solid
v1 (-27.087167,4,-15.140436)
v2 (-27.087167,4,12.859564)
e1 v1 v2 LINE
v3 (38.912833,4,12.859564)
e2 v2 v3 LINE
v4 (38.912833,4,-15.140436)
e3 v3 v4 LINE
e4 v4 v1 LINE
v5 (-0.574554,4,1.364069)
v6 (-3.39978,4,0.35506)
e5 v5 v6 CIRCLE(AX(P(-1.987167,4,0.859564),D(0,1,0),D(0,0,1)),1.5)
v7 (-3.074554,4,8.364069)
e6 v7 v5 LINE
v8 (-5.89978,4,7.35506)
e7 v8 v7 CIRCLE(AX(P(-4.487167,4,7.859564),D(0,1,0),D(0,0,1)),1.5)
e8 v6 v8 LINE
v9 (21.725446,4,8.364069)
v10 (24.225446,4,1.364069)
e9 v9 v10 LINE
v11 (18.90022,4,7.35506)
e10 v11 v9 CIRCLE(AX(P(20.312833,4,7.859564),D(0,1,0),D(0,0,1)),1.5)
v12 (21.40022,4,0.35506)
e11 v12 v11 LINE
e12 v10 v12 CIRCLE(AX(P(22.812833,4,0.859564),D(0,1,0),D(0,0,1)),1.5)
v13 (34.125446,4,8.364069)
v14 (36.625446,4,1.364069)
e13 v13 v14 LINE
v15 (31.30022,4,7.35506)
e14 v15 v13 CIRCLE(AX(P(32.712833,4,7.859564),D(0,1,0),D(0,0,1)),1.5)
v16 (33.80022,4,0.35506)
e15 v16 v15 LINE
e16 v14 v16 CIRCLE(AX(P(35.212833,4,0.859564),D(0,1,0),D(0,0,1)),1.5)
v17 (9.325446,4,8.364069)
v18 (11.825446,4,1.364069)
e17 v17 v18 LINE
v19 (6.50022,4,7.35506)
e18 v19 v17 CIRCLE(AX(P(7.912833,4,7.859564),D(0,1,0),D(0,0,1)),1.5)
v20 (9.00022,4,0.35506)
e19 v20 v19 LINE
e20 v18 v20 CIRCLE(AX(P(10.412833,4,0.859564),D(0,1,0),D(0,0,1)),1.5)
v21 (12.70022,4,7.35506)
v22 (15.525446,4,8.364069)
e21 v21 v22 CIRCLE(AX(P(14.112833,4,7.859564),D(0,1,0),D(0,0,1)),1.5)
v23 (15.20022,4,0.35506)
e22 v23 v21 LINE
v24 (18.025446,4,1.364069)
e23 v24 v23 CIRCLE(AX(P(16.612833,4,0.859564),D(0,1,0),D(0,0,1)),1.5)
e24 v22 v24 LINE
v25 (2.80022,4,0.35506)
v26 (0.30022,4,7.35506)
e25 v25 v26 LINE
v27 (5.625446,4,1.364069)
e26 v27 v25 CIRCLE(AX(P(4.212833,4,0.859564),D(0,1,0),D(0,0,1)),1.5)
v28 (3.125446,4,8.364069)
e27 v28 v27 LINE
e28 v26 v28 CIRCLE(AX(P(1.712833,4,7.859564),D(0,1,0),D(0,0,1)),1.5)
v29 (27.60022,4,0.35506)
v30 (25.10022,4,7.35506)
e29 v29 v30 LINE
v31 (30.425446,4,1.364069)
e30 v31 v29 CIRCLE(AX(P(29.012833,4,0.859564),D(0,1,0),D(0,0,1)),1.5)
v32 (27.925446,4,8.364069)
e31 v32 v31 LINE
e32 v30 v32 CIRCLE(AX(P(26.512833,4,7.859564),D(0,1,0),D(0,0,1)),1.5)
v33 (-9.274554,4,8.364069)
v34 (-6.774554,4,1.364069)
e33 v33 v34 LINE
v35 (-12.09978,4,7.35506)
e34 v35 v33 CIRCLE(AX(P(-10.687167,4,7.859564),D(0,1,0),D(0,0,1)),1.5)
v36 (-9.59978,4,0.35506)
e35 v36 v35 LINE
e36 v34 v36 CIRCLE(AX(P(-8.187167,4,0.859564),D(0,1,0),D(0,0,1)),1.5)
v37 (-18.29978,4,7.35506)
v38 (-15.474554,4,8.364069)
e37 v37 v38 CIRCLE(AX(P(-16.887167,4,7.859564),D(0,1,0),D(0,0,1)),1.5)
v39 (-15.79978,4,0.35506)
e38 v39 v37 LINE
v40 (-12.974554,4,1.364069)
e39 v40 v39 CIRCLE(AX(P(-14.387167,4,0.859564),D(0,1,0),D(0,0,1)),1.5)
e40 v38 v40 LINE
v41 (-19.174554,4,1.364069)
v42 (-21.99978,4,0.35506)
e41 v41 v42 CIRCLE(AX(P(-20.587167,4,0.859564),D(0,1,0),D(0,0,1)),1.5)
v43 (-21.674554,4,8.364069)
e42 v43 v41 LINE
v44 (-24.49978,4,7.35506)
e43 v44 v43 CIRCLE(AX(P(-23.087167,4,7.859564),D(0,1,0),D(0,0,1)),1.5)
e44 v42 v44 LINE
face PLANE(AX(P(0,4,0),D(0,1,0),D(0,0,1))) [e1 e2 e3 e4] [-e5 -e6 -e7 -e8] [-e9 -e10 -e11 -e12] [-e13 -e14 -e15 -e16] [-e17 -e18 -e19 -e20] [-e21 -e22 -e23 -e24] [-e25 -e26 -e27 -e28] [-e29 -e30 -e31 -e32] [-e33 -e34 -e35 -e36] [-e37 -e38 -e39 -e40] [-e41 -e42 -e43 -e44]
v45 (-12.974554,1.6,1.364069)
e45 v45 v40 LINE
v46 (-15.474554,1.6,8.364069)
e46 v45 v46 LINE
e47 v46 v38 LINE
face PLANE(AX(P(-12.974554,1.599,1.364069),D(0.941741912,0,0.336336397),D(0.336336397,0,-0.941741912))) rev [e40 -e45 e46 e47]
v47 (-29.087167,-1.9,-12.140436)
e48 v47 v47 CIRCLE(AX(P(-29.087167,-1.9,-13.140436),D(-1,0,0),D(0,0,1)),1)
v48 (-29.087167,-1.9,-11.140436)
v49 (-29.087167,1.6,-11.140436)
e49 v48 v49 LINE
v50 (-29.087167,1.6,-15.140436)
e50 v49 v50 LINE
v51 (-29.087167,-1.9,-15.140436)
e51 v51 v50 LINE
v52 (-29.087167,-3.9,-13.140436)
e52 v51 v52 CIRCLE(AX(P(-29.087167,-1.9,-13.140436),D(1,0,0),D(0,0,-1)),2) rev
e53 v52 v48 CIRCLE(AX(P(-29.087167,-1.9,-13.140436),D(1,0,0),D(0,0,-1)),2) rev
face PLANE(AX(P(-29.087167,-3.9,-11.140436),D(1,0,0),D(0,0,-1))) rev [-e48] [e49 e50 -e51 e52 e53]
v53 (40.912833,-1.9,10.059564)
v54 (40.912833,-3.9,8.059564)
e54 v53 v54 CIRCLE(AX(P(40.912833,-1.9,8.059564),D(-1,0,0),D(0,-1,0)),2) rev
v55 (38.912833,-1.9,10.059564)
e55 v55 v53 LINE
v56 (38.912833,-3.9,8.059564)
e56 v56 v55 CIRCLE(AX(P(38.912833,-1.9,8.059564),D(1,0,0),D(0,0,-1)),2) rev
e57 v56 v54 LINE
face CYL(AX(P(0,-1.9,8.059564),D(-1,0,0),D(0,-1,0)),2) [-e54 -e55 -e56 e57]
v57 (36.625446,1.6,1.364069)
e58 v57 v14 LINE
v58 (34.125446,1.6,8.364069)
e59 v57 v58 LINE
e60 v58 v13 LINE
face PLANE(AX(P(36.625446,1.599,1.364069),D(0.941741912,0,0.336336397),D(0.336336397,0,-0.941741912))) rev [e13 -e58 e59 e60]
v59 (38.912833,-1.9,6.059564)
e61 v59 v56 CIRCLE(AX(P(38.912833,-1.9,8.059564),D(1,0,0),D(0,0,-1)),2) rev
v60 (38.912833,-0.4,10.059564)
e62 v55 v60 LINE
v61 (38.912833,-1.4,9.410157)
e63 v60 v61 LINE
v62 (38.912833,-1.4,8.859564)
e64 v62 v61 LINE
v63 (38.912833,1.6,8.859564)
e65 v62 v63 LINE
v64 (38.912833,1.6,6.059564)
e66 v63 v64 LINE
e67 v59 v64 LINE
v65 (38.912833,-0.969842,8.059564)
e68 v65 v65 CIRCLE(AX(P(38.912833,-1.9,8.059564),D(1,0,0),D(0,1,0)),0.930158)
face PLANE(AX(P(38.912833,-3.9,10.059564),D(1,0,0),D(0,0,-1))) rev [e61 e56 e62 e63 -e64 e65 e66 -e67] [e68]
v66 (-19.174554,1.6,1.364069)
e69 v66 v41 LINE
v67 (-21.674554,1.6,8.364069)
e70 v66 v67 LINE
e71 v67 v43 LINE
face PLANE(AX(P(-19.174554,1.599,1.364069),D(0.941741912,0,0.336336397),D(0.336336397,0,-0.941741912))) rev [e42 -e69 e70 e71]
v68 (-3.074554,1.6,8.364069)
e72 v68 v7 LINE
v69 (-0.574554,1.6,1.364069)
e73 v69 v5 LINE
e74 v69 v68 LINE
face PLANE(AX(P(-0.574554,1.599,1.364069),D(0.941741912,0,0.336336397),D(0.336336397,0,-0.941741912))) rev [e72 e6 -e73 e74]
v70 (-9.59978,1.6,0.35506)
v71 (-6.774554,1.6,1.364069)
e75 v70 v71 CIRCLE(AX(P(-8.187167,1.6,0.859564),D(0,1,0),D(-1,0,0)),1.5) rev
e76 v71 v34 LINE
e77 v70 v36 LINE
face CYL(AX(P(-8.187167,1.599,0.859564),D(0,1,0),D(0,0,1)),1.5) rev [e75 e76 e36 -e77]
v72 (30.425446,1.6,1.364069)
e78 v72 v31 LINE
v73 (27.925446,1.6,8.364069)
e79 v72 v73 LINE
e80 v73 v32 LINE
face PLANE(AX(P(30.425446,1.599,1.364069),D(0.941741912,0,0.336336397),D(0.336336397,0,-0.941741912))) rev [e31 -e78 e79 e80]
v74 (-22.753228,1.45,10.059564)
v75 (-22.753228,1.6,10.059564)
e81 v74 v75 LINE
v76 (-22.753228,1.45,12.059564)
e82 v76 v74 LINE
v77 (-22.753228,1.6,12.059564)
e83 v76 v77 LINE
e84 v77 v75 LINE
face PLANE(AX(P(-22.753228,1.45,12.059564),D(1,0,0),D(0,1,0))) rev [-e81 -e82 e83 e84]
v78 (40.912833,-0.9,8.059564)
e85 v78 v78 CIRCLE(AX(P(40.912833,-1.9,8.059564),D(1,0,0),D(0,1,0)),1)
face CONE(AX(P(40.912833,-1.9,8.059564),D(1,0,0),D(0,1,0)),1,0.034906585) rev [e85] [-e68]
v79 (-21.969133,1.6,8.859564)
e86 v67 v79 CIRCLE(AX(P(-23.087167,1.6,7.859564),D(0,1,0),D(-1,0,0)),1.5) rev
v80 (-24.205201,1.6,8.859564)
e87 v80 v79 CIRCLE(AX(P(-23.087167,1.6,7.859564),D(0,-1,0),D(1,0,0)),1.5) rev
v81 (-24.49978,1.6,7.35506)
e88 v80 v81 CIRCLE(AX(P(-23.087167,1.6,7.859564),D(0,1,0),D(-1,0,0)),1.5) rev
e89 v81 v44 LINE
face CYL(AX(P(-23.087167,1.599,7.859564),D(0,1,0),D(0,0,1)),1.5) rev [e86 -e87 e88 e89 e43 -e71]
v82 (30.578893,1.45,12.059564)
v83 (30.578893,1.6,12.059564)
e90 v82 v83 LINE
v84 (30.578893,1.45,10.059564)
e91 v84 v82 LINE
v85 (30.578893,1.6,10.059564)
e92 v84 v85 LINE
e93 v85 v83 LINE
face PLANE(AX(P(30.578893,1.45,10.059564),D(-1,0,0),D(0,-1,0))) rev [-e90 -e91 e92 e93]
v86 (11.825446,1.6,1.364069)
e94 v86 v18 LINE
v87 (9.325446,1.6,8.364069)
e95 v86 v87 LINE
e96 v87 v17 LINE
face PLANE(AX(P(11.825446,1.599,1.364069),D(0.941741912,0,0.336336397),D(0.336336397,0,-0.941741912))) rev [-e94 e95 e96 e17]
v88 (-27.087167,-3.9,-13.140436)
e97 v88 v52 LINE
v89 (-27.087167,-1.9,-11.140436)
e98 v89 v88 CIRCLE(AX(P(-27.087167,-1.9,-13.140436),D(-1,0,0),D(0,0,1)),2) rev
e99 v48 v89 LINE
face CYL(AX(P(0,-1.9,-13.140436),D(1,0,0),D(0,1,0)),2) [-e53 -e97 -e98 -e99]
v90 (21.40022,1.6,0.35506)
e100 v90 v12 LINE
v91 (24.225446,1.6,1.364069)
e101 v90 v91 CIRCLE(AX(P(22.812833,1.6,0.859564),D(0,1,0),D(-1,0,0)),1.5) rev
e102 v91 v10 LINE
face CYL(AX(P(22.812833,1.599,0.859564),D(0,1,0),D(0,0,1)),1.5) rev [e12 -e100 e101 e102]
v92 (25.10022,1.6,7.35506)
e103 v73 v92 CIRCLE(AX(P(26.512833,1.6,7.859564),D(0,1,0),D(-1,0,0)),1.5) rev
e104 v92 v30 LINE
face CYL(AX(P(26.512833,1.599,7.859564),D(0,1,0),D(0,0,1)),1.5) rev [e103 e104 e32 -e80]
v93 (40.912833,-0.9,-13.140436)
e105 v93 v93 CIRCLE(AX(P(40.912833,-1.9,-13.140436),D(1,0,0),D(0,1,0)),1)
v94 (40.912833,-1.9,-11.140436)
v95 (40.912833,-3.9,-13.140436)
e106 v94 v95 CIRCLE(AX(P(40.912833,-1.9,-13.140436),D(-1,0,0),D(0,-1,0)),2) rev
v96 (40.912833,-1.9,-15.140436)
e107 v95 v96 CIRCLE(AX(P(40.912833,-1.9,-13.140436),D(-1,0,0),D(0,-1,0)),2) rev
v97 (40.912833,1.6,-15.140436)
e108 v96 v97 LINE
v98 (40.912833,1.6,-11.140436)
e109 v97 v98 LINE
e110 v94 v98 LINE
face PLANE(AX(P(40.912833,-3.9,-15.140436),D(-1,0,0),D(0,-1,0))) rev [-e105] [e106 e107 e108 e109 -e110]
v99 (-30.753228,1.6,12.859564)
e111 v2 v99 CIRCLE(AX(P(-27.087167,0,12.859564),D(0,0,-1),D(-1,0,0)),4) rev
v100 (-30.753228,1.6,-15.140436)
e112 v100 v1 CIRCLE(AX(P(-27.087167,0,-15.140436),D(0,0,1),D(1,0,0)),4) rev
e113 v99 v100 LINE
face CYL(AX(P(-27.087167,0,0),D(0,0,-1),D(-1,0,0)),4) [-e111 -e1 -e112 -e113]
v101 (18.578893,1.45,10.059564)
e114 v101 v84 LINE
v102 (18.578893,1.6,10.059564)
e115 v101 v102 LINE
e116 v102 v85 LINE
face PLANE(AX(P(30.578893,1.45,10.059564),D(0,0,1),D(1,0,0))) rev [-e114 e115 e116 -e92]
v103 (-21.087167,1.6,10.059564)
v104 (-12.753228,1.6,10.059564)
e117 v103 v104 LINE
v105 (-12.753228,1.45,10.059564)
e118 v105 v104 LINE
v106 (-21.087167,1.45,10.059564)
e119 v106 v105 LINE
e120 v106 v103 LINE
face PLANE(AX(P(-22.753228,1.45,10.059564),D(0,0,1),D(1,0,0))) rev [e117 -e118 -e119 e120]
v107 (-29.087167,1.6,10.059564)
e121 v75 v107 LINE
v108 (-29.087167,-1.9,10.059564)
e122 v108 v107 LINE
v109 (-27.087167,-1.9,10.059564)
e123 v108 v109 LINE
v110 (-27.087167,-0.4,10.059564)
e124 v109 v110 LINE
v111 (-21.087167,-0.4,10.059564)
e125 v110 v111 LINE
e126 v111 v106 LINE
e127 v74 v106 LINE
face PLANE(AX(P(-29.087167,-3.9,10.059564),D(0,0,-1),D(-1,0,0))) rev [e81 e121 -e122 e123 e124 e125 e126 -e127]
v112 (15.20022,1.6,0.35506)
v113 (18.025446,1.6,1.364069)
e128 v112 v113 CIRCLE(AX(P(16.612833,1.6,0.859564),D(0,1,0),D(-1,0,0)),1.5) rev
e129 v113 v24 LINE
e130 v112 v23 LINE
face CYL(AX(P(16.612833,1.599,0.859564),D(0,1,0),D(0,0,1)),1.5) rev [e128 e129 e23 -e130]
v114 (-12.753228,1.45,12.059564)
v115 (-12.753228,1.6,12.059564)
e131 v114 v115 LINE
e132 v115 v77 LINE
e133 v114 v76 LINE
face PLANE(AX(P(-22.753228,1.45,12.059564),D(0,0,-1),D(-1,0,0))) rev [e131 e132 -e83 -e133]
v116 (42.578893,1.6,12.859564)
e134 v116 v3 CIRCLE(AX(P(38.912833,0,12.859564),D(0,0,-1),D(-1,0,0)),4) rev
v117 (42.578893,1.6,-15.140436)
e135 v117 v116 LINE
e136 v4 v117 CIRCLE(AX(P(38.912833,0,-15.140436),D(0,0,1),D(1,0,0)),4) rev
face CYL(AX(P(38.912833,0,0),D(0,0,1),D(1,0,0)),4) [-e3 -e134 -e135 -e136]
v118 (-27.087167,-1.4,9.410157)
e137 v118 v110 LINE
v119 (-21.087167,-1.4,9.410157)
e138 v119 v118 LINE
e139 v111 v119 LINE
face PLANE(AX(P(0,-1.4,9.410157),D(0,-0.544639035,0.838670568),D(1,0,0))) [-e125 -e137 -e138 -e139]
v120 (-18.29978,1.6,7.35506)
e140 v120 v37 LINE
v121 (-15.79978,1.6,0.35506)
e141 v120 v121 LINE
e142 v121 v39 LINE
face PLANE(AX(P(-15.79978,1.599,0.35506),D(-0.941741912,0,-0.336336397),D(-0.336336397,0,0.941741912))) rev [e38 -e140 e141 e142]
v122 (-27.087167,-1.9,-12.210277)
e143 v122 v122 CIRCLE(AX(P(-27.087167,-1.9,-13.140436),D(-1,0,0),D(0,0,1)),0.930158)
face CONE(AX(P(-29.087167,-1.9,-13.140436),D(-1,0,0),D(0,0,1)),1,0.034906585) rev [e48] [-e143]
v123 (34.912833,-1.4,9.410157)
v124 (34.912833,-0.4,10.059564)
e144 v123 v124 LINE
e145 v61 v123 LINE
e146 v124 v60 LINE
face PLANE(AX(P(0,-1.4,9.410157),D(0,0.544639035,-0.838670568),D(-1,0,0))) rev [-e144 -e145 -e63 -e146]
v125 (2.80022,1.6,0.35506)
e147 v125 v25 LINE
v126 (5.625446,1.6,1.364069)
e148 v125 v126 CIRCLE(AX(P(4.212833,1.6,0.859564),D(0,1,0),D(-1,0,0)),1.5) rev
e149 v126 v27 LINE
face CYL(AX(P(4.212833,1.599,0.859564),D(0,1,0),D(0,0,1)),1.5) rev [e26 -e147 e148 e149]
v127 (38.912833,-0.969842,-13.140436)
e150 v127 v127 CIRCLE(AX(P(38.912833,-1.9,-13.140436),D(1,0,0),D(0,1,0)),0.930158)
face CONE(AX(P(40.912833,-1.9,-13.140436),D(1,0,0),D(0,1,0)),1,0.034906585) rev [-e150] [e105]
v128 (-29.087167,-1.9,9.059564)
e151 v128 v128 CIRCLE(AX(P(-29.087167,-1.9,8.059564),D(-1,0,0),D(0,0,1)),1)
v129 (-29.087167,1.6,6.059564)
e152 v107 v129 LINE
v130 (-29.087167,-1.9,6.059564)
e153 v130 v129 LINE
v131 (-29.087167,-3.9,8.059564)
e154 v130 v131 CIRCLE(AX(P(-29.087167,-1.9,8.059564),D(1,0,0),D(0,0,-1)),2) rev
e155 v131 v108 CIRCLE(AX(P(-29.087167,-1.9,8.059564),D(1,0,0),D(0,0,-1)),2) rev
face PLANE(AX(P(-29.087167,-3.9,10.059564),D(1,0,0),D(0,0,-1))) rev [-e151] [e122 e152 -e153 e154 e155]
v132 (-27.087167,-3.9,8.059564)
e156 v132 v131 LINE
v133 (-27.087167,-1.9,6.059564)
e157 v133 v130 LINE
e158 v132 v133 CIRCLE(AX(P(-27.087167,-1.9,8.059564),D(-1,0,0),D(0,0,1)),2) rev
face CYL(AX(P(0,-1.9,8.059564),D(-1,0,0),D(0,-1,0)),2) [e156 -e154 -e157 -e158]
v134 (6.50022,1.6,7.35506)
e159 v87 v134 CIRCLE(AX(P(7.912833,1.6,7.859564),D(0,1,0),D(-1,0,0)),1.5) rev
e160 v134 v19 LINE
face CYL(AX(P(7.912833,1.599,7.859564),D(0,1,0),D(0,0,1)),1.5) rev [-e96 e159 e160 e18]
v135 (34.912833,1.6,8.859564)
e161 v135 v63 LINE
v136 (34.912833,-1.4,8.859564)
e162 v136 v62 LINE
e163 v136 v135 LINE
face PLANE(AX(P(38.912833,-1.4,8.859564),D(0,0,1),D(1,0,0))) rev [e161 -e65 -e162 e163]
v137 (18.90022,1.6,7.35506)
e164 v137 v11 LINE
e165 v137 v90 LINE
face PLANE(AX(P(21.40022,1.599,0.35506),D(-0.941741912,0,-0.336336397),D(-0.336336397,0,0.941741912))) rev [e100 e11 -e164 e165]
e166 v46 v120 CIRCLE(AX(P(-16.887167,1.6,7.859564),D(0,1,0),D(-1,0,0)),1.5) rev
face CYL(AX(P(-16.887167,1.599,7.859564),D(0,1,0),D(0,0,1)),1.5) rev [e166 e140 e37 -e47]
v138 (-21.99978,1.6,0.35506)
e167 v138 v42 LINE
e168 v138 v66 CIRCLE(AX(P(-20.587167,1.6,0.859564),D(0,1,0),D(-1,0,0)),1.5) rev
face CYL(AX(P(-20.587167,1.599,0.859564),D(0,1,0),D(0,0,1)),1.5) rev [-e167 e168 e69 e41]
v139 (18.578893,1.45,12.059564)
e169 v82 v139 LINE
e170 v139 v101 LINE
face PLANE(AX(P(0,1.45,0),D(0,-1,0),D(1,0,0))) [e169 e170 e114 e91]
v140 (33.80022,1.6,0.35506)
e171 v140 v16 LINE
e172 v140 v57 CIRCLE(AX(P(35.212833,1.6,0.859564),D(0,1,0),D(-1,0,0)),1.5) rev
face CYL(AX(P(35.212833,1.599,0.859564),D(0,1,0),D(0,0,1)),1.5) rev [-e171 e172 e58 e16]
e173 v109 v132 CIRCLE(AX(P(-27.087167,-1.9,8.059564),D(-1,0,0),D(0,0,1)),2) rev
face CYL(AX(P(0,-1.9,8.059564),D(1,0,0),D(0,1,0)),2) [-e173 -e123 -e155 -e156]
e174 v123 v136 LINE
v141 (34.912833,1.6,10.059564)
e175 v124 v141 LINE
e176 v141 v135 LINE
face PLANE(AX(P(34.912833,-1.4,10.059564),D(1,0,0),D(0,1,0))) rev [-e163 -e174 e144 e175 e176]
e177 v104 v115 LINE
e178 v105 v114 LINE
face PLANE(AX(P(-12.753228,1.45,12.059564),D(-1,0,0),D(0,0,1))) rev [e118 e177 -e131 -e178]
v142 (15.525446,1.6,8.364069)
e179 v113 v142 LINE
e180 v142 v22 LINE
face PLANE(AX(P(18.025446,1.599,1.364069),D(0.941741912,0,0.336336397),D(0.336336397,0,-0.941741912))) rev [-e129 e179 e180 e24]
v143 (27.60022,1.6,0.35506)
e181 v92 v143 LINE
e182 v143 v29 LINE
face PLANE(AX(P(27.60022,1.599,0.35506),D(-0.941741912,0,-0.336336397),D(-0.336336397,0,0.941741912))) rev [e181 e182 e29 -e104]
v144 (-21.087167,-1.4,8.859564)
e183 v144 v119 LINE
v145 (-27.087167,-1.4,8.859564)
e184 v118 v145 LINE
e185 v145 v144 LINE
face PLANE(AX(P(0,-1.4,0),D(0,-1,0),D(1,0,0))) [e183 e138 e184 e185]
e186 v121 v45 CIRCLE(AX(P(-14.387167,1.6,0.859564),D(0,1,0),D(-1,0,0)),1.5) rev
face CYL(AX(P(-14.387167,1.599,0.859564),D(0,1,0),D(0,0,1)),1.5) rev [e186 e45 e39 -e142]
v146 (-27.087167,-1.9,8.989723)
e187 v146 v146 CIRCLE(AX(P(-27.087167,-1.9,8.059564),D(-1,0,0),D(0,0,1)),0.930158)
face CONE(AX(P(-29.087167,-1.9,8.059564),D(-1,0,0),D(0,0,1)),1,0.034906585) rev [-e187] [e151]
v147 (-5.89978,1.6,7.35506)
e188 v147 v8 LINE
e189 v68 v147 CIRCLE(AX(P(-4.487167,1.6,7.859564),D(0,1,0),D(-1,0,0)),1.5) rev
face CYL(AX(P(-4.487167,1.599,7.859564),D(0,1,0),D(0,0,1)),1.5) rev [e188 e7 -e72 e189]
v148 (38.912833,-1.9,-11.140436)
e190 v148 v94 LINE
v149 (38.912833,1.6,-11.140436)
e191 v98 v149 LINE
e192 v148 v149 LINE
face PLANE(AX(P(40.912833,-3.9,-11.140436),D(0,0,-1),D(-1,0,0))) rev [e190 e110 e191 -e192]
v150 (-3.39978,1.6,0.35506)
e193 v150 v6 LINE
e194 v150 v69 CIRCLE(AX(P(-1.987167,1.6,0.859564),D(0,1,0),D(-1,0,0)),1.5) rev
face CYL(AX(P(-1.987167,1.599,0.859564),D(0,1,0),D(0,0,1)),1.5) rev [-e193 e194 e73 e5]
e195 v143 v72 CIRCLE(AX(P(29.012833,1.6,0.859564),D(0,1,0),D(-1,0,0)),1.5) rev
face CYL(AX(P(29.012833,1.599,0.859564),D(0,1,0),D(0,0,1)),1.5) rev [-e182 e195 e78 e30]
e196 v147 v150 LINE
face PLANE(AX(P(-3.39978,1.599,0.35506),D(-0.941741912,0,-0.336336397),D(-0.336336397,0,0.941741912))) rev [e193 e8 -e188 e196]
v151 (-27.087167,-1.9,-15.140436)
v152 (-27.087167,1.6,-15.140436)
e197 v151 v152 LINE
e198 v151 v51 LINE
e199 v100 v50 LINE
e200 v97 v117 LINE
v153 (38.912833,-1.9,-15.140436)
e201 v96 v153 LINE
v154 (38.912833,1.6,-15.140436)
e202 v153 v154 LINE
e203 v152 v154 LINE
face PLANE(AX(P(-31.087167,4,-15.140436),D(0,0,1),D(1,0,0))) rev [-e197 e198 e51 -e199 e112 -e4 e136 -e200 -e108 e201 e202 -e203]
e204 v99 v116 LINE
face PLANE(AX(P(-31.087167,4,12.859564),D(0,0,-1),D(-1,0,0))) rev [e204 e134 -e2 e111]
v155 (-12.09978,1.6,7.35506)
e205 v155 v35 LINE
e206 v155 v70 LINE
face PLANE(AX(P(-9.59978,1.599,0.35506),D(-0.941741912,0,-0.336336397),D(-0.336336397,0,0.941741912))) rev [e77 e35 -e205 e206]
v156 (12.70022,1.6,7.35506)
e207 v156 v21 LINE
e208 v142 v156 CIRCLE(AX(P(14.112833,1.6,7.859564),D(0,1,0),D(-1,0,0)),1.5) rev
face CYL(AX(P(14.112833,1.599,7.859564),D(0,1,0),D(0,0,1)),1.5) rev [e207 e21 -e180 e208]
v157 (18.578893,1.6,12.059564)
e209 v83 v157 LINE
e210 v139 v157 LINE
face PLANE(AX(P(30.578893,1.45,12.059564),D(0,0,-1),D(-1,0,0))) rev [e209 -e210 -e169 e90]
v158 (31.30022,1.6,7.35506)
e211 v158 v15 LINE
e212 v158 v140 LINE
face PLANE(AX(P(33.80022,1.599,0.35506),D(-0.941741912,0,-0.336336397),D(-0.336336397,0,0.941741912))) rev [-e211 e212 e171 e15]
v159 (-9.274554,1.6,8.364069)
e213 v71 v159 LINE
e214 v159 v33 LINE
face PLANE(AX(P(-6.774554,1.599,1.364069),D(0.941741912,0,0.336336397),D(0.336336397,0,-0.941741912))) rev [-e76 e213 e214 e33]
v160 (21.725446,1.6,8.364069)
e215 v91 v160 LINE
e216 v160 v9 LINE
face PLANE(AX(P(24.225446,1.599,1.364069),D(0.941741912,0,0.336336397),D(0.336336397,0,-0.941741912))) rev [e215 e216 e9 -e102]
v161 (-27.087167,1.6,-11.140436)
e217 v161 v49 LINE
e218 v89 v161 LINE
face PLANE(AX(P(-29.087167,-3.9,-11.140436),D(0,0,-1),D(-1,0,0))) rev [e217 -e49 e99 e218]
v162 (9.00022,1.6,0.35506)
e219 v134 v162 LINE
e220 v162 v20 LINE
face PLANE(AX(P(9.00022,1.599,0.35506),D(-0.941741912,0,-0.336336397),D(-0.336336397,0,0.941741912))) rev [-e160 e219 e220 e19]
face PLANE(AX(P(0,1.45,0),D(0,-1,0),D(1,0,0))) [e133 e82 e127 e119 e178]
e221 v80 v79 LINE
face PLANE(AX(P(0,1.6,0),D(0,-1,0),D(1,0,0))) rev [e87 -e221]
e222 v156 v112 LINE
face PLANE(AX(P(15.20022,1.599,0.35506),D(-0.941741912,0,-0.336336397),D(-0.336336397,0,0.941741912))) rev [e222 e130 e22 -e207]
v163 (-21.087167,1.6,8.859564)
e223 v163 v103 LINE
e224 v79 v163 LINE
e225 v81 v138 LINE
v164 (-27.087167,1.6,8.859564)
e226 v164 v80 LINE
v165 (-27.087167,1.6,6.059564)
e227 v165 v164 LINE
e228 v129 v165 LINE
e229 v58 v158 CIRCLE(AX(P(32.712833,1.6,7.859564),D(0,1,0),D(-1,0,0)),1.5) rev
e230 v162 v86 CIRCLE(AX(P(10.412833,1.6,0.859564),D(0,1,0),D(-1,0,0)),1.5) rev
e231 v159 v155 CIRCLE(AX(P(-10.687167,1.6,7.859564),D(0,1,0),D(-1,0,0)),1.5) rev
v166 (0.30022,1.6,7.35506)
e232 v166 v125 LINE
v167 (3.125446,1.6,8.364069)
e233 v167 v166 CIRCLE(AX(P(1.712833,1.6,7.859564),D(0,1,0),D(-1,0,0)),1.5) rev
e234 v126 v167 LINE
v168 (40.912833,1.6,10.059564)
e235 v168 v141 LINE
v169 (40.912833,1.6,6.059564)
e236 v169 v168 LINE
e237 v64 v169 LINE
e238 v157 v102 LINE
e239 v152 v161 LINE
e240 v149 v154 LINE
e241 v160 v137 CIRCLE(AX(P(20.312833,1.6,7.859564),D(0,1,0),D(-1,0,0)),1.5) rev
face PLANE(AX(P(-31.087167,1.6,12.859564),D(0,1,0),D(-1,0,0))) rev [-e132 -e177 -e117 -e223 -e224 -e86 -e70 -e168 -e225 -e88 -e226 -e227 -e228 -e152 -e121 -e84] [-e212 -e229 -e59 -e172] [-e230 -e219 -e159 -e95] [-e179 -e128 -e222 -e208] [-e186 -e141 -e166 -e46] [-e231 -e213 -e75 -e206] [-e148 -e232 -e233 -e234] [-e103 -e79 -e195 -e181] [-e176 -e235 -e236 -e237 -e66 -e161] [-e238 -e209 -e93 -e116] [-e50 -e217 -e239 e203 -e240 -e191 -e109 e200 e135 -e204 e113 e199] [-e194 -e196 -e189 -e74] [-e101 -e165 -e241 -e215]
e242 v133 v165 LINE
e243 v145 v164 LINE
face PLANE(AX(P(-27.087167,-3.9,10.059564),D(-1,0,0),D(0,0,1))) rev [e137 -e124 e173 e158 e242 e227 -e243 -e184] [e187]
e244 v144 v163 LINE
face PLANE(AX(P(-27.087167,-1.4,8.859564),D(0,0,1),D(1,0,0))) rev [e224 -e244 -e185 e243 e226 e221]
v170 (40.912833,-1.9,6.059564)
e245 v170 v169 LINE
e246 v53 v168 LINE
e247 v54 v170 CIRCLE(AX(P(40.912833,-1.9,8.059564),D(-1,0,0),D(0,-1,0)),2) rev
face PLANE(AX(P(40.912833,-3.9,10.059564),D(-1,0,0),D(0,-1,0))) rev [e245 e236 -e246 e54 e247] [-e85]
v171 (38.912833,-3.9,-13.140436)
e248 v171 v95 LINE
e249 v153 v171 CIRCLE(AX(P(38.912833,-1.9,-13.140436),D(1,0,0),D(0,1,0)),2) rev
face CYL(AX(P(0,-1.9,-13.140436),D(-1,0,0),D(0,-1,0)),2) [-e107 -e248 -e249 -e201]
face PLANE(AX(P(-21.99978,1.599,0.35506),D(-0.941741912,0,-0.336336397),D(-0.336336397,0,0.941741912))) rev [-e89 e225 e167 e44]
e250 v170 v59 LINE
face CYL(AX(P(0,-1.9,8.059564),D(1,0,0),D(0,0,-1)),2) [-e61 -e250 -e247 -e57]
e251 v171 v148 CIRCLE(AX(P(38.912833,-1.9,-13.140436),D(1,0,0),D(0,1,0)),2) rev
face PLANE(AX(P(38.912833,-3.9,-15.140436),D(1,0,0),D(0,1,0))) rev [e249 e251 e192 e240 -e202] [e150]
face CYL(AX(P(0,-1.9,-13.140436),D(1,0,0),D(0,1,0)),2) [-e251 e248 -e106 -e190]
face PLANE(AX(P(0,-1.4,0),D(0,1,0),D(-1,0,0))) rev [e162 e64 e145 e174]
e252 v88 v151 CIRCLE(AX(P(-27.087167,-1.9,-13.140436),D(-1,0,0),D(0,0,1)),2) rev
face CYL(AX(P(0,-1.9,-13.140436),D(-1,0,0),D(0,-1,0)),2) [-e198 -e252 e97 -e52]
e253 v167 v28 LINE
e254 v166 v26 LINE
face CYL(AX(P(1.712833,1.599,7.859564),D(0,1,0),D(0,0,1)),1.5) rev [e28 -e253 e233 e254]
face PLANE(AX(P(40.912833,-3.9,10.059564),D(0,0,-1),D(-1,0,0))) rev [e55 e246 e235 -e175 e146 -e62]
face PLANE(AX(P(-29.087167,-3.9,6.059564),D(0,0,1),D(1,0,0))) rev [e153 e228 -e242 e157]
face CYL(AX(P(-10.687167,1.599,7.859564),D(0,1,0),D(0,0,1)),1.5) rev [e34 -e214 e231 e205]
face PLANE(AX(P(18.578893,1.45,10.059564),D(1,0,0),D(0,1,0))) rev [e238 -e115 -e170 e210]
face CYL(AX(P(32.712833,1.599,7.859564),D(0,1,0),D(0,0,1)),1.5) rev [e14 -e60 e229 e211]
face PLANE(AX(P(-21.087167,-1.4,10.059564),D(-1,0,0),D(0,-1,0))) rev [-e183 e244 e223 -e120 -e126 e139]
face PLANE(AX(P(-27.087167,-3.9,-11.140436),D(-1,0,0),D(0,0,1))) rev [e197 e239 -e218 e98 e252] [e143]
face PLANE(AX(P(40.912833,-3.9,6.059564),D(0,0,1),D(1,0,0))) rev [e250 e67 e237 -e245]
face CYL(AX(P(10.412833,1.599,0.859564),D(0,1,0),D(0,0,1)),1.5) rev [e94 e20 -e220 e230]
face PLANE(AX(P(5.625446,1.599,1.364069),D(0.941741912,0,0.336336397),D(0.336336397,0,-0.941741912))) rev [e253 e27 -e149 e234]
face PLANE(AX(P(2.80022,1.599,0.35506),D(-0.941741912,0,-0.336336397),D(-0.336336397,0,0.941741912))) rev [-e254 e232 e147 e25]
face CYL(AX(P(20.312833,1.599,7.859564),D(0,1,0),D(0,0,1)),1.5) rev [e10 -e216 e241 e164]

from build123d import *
from OCP.BRepFilletAPI import BRepFilletAPI_MakeChamfer

# Parameters (mm, degrees)
SKETCH_2_W                    = 74
SKETCH_2_H                    = 28
EXTRUDE_1_DEPTH               = 4
FILLET_1_R                    = 4
SKETCH_3_W                    = 74
SKETCH_3_H                    = 1.6
CUT_EXTRUDE_1_DEPTH           = 52.395634348
CUT_EXTRUDE_6_REACH           = 47.254
SKETCH_21_W                   = 10
SKETCH_21_H                   = 2
SKETCH_21_W_2                 = 12
EXTRUDE_9_DEPTH               = 0.15
SKETCH_22_W                   = 2
SKETCH_22_H                   = 4
EXTRUDE_10_DEPTH              = 5.5
FILLET_3_R                    = 2
SKETCH_23_R                   = 1
CUT_EXTRUDE_8_DEPTH           = 2
CUT_EXTRUDE_8_DRAFT           = -2
CUT_EXTRUDE_8_PROFILE_2_DEPTH = 2
CUT_EXTRUDE_8_PROFILE_2_DRAFT = -2
SKETCH_24_R                   = 1
CUT_EXTRUDE_9_DEPTH           = 2
CUT_EXTRUDE_9_DRAFT           = -2
CUT_EXTRUDE_9_PROFILE_2_DEPTH = 2
CUT_EXTRUDE_9_PROFILE_2_DRAFT = -2
SKETCH_25_W                   = 6
SKETCH_25_H                   = 1.2
SKETCH_25_W_2                 = 4
EXTRUDE_11_DEPTH              = 3
CHAMFER_1_SIZE                = 1
CHAMFER_1_SIZE2               = 0.649407593


with BuildPart() as part:
    # 草图2 → 凸台-拉伸1 (new body)
    with BuildSketch(Plane(origin=(0, 0, 0), x_dir=(1, 0, 0), z_dir=(0, 1, 0))):
        with Locations((5.91283293, 1.140435835)):
            Rectangle(SKETCH_2_W, SKETCH_2_H)
    extrude(amount=EXTRUDE_1_DEPTH)

    # 圆角1
    fillet_1_edges = [part.edges().sort_by_distance(p)[0] for p in [
        (-31.08716707, 4, -1.140435835),
        (42.91283293, 4, -1.140435835),
    ]]
    fillet(fillet_1_edges, radius=FILLET_1_R - 0.0001)  # a hair under: the kernel refuses the full size

    # 草图3 → 切除-拉伸1 (cut, through all)
    with BuildSketch(Plane(origin=(0, 0, -15.140435835), x_dir=(-1, 0, 0), z_dir=(0, 0, -1))):
        with Locations((-5.91283293, 0.8)):
            Rectangle(SKETCH_3_W, SKETCH_3_H)
    extrude(amount=-CUT_EXTRUDE_1_DEPTH, mode=Mode.SUBTRACT)

    # 草图19 → 切除-拉伸6 (cut, up to next)
    with BuildSketch(Plane(origin=(0, 4, 0), x_dir=(1, 0, 0), z_dir=(0, 1, 0)), mode=Mode.PRIVATE) as cut_extrude_6_sk1:
        with BuildLine():
            Line((-19.174554203, -1.36406876), (-21.674554203, -8.36406876))
            ThreePointArc((-21.674554203, -8.36406876), (-23.591671666, -9.272177032), (-24.499779938, -7.355059569))
            Line((-24.499779938, -7.355059569), (-21.999779938, -0.355059569))
            ThreePointArc((-21.999779938, -0.355059569), (-20.082662475, 0.553048703), (-19.174554203, -1.36406876))
        make_face()
    cut_extrude_6_tool1 = extrude(cut_extrude_6_sk1.sketch, amount=-CUT_EXTRUDE_6_REACH, mode=Mode.PRIVATE) & part.part
    # 草图19 → 切除-拉伸6 (cut, up to next)
    with BuildSketch(Plane(origin=(0, 4, 0), x_dir=(1, 0, 0), z_dir=(0, 1, 0)), mode=Mode.PRIVATE) as cut_extrude_6_sk2:
        with BuildLine():
            Line((-12.974554203, -1.36406876), (-15.474554203, -8.36406876))
            ThreePointArc((-15.474554203, -8.36406876), (-17.391671666, -9.272177032), (-18.299779938, -7.355059569))
            Line((-18.299779938, -7.355059569), (-15.799779938, -0.355059569))
            ThreePointArc((-15.799779938, -0.355059569), (-13.882662475, 0.553048703), (-12.974554203, -1.36406876))
        make_face()
    cut_extrude_6_tool2 = extrude(cut_extrude_6_sk2.sketch, amount=-CUT_EXTRUDE_6_REACH, mode=Mode.PRIVATE) & part.part
    # 草图19 → 切除-拉伸6 (cut, up to next)
    with BuildSketch(Plane(origin=(0, 4, 0), x_dir=(1, 0, 0), z_dir=(0, 1, 0)), mode=Mode.PRIVATE) as cut_extrude_6_sk3:
        with BuildLine():
            Line((-6.774554203, -1.36406876), (-9.274554203, -8.36406876))
            ThreePointArc((-9.274554203, -8.36406876), (-11.191671666, -9.272177032), (-12.099779938, -7.355059569))
            Line((-12.099779938, -7.355059569), (-9.599779938, -0.355059569))
            ThreePointArc((-9.599779938, -0.355059569), (-7.682662475, 0.553048703), (-6.774554203, -1.36406876))
        make_face()
    cut_extrude_6_tool3 = extrude(cut_extrude_6_sk3.sketch, amount=-CUT_EXTRUDE_6_REACH, mode=Mode.PRIVATE) & part.part
    # 草图19 → 切除-拉伸6 (cut, up to next)
    with BuildSketch(Plane(origin=(0, 4, 0), x_dir=(1, 0, 0), z_dir=(0, 1, 0)), mode=Mode.PRIVATE) as cut_extrude_6_sk4:
        with BuildLine():
            Line((-0.574554203, -1.36406876), (-3.074554203, -8.36406876))
            ThreePointArc((-3.074554203, -8.36406876), (-4.991671666, -9.272177032), (-5.899779938, -7.355059569))
            Line((-5.899779938, -7.355059569), (-3.399779938, -0.355059569))
            ThreePointArc((-3.399779938, -0.355059569), (-1.482662475, 0.553048703), (-0.574554203, -1.36406876))
        make_face()
    cut_extrude_6_tool4 = extrude(cut_extrude_6_sk4.sketch, amount=-CUT_EXTRUDE_6_REACH, mode=Mode.PRIVATE) & part.part
    # 草图19 → 切除-拉伸6 (cut, up to next)
    with BuildSketch(Plane(origin=(0, 4, 0), x_dir=(1, 0, 0), z_dir=(0, 1, 0)), mode=Mode.PRIVATE) as cut_extrude_6_sk5:
        with BuildLine():
            Line((5.625445797, -1.36406876), (3.125445797, -8.36406876))
            ThreePointArc((3.125445797, -8.36406876), (1.208328334, -9.272177032), (0.300220062, -7.355059569))
            Line((0.300220062, -7.355059569), (2.800220062, -0.355059569))
            ThreePointArc((2.800220062, -0.355059569), (4.717337525, 0.553048703), (5.625445797, -1.36406876))
        make_face()
    cut_extrude_6_tool5 = extrude(cut_extrude_6_sk5.sketch, amount=-CUT_EXTRUDE_6_REACH, mode=Mode.PRIVATE) & part.part
    # 草图19 → 切除-拉伸6 (cut, up to next)
    with BuildSketch(Plane(origin=(0, 4, 0), x_dir=(1, 0, 0), z_dir=(0, 1, 0)), mode=Mode.PRIVATE) as cut_extrude_6_sk6:
        with BuildLine():
            Line((11.825445797, -1.36406876), (9.325445797, -8.36406876))
            ThreePointArc((9.325445797, -8.36406876), (7.408328334, -9.272177032), (6.500220062, -7.355059569))
            Line((6.500220062, -7.355059569), (9.000220062, -0.355059569))
            ThreePointArc((9.000220062, -0.355059569), (10.917337525, 0.553048703), (11.825445797, -1.36406876))
        make_face()
    cut_extrude_6_tool6 = extrude(cut_extrude_6_sk6.sketch, amount=-CUT_EXTRUDE_6_REACH, mode=Mode.PRIVATE) & part.part
    # 草图19 → 切除-拉伸6 (cut, up to next)
    with BuildSketch(Plane(origin=(0, 4, 0), x_dir=(1, 0, 0), z_dir=(0, 1, 0)), mode=Mode.PRIVATE) as cut_extrude_6_sk7:
        with BuildLine():
            Line((18.025445797, -1.36406876), (15.525445797, -8.36406876))
            ThreePointArc((15.525445797, -8.36406876), (13.608328334, -9.272177032), (12.700220062, -7.355059569))
            Line((12.700220062, -7.355059569), (15.200220062, -0.355059569))
            ThreePointArc((15.200220062, -0.355059569), (17.117337525, 0.553048703), (18.025445797, -1.36406876))
        make_face()
    cut_extrude_6_tool7 = extrude(cut_extrude_6_sk7.sketch, amount=-CUT_EXTRUDE_6_REACH, mode=Mode.PRIVATE) & part.part
    # 草图19 → 切除-拉伸6 (cut, up to next)
    with BuildSketch(Plane(origin=(0, 4, 0), x_dir=(1, 0, 0), z_dir=(0, 1, 0)), mode=Mode.PRIVATE) as cut_extrude_6_sk8:
        with BuildLine():
            Line((24.225445797, -1.36406876), (21.725445797, -8.36406876))
            ThreePointArc((21.725445797, -8.36406876), (19.808328334, -9.272177032), (18.900220062, -7.355059569))
            Line((18.900220062, -7.355059569), (21.400220062, -0.355059569))
            ThreePointArc((21.400220062, -0.355059569), (23.317337525, 0.553048703), (24.225445797, -1.36406876))
        make_face()
    cut_extrude_6_tool8 = extrude(cut_extrude_6_sk8.sketch, amount=-CUT_EXTRUDE_6_REACH, mode=Mode.PRIVATE) & part.part
    # 草图19 → 切除-拉伸6 (cut, up to next)
    with BuildSketch(Plane(origin=(0, 4, 0), x_dir=(1, 0, 0), z_dir=(0, 1, 0)), mode=Mode.PRIVATE) as cut_extrude_6_sk9:
        with BuildLine():
            Line((30.425445797, -1.36406876), (27.925445797, -8.36406876))
            ThreePointArc((27.925445797, -8.36406876), (26.008328334, -9.272177032), (25.100220062, -7.355059569))
            Line((25.100220062, -7.355059569), (27.600220062, -0.355059569))
            ThreePointArc((27.600220062, -0.355059569), (29.517337525, 0.553048703), (30.425445797, -1.36406876))
        make_face()
    cut_extrude_6_tool9 = extrude(cut_extrude_6_sk9.sketch, amount=-CUT_EXTRUDE_6_REACH, mode=Mode.PRIVATE) & part.part
    # 草图19 → 切除-拉伸6 (cut, up to next)
    with BuildSketch(Plane(origin=(0, 4, 0), x_dir=(1, 0, 0), z_dir=(0, 1, 0)), mode=Mode.PRIVATE) as cut_extrude_6_sk10:
        with BuildLine():
            Line((36.625445797, -1.36406876), (34.125445797, -8.36406876))
            ThreePointArc((34.125445797, -8.36406876), (32.208328334, -9.272177032), (31.300220062, -7.355059569))
            Line((31.300220062, -7.355059569), (33.800220062, -0.355059569))
            ThreePointArc((33.800220062, -0.355059569), (35.717337525, 0.553048703), (36.625445797, -1.36406876))
        make_face()
    cut_extrude_6_tool10 = extrude(cut_extrude_6_sk10.sketch, amount=-CUT_EXTRUDE_6_REACH, mode=Mode.PRIVATE) & part.part
    add(cut_extrude_6_tool1.solids().sort_by_distance((-21.837167, 4, 4.359564))[0], mode=Mode.SUBTRACT)
    add(cut_extrude_6_tool2.solids().sort_by_distance((-15.637167, 4, 4.359564))[0], mode=Mode.SUBTRACT)
    add(cut_extrude_6_tool3.solids().sort_by_distance((-9.437167, 4, 4.359564))[0], mode=Mode.SUBTRACT)
    add(cut_extrude_6_tool4.solids().sort_by_distance((-3.237167, 4, 4.359564))[0], mode=Mode.SUBTRACT)
    add(cut_extrude_6_tool5.solids().sort_by_distance((2.962833, 4, 4.359564))[0], mode=Mode.SUBTRACT)
    add(cut_extrude_6_tool6.solids().sort_by_distance((9.162833, 4, 4.359564))[0], mode=Mode.SUBTRACT)
    add(cut_extrude_6_tool7.solids().sort_by_distance((15.362833, 4, 4.359564))[0], mode=Mode.SUBTRACT)
    add(cut_extrude_6_tool8.solids().sort_by_distance((21.562833, 4, 4.359564))[0], mode=Mode.SUBTRACT)
    add(cut_extrude_6_tool9.solids().sort_by_distance((27.762833, 4, 4.359564))[0], mode=Mode.SUBTRACT)
    add(cut_extrude_6_tool10.solids().sort_by_distance((33.962833, 4, 4.359564))[0], mode=Mode.SUBTRACT)

    # 草图21 → 凸台-拉伸9 (add)
    with BuildSketch(Plane.XZ.offset(-1.6)):
        with Locations((-17.753227626, 11.059564165)):
            Rectangle(SKETCH_21_W, SKETCH_21_H)
        with Locations((24.578893486, 11.059564165)):
            Rectangle(SKETCH_21_W_2, SKETCH_21_H)
    extrude(amount=EXTRUDE_9_DEPTH)

    # 草图22 → 凸台-拉伸10 (add)
    with BuildSketch(Plane.XZ.offset(-1.6)):
        with Locations((-28.08716707, 8.059564165)):
            Rectangle(SKETCH_22_W, SKETCH_22_H)
        with Locations((-28.08716707, -13.140435835)):
            Rectangle(SKETCH_22_W, SKETCH_22_H)
        with Locations((39.91283293, 8.059564165)):
            Rectangle(SKETCH_22_W, SKETCH_22_H)
        with Locations((39.91283293, -13.140435835)):
            Rectangle(SKETCH_22_W, SKETCH_22_H)
    extrude(amount=EXTRUDE_10_DEPTH)

    # 圆角3
    fillet_3_edges = [part.edges().sort_by_distance(p)[0] for p in [
        (-28.08716707, -3.9, -15.140435835),
        (-28.08716707, -3.9, -11.140435835),
        (-28.08716707, -3.9, 6.059564165),
        (-28.08716707, -3.9, 10.059564165),
        (39.91283293, -3.9, -11.140435835),
        (39.91283293, -3.9, -15.140435835),
        (39.91283293, -3.9, 6.059564165),
        (39.91283293, -3.9, 10.059564165),
    ]]
    fillet(fillet_3_edges, radius=FILLET_3_R - 0.0001)  # a hair under: the kernel refuses the full size


with BuildPart() as cut_extrude_8_tool:
    # 草图23 → 切除-拉伸8 (with draft: the straight prism first)
    with BuildSketch(Plane.ZY.offset(29.08716707)):
        with Locations((8.059564165, -1.9)):
            Circle(SKETCH_23_R)
    extrude(amount=-CUT_EXTRUDE_8_DEPTH)
    # 切除-拉伸8: the draft: its side faces are tilted about the plane it starts from
    cut_extrude_8_sides = [cut_extrude_8_tool.faces().sort_by_distance(p)[0] for p in [
        (-28.08716707, -1.9, 7.059564165),
    ]]
    draft(cut_extrude_8_sides, Plane.ZY.offset(29.08716707), CUT_EXTRUDE_8_DRAFT)


with BuildPart() as part_1:
    add(part.part)

    # 切除-拉伸8: cut by cut_extrude_8_tool
    add(cut_extrude_8_tool.part, mode=Mode.SUBTRACT)


with BuildPart() as cut_extrude_8_profile_2_tool:
    # 草图23 → 切除-拉伸8 profile 2 (with draft: the straight prism first)
    with BuildSketch(Plane.ZY.offset(29.08716707)):
        with Locations((-13.140435835, -1.9)):
            Circle(SKETCH_23_R)
    extrude(amount=-CUT_EXTRUDE_8_PROFILE_2_DEPTH)
    # 切除-拉伸8 profile 2: the draft: its side faces are tilted about the plane it starts from
    cut_extrude_8_profile_2_sides = [cut_extrude_8_profile_2_tool.faces().sort_by_distance(p)[0] for p in [
        (-28.08716707, -1.9, -14.140435835),
    ]]
    draft(cut_extrude_8_profile_2_sides, Plane.ZY.offset(29.08716707), CUT_EXTRUDE_8_PROFILE_2_DRAFT)


with BuildPart() as part_2:
    add(part_1.part)

    # 切除-拉伸8 profile 2: cut by cut_extrude_8_profile_2_tool
    add(cut_extrude_8_profile_2_tool.part, mode=Mode.SUBTRACT)


with BuildPart() as cut_extrude_9_tool:
    # 草图24 → 切除-拉伸9 (with draft: the straight prism first)
    with BuildSketch(Plane(origin=(40.91283293, 0, 0), x_dir=(0, 0, -1), z_dir=(1, 0, 0))):
        with Locations((13.140435835, -1.9)):
            Circle(SKETCH_24_R)
    extrude(amount=-CUT_EXTRUDE_9_DEPTH)
    # 切除-拉伸9: the draft: its side faces are tilted about the plane it starts from
    cut_extrude_9_sides = [cut_extrude_9_tool.faces().sort_by_distance(p)[0] for p in [
        (39.91283293, -1.9, -12.140435835),
    ]]
    draft(cut_extrude_9_sides, Plane(origin=(40.91283293, 0, 0), x_dir=(0, 0, -1), z_dir=(1, 0, 0)), CUT_EXTRUDE_9_DRAFT)


with BuildPart() as part_3:
    add(part_2.part)

    # 切除-拉伸9: cut by cut_extrude_9_tool
    add(cut_extrude_9_tool.part, mode=Mode.SUBTRACT)


with BuildPart() as cut_extrude_9_profile_2_tool:
    # 草图24 → 切除-拉伸9 profile 2 (with draft: the straight prism first)
    with BuildSketch(Plane(origin=(40.91283293, 0, 0), x_dir=(0, 0, -1), z_dir=(1, 0, 0))):
        with Locations((-8.059564165, -1.9)):
            Circle(SKETCH_24_R)
    extrude(amount=-CUT_EXTRUDE_9_PROFILE_2_DEPTH)
    # 切除-拉伸9 profile 2: the draft: its side faces are tilted about the plane it starts from
    cut_extrude_9_profile_2_sides = [cut_extrude_9_profile_2_tool.faces().sort_by_distance(p)[0] for p in [
        (39.91283293, -1.9, 9.059564165),
    ]]
    draft(cut_extrude_9_profile_2_sides, Plane(origin=(40.91283293, 0, 0), x_dir=(0, 0, -1), z_dir=(1, 0, 0)), CUT_EXTRUDE_9_PROFILE_2_DRAFT)


with BuildPart() as part_4:
    add(part_3.part)

    # 切除-拉伸9 profile 2: cut by cut_extrude_9_profile_2_tool
    add(cut_extrude_9_profile_2_tool.part, mode=Mode.SUBTRACT)

    # 草图25 → 凸台-拉伸11 (add)
    with BuildSketch(Plane.XZ.offset(-1.6)):
        with Locations((-24.08716707, 9.459564165)):
            Rectangle(SKETCH_25_W, SKETCH_25_H)
        with Locations((36.91283293, 9.459564165)):
            Rectangle(SKETCH_25_W_2, SKETCH_25_H)
    extrude(amount=EXTRUDE_11_DEPTH)

    # 倒角1: one chamfer whose edges measure the first distance from different faces: ONE call of the kernel's chamfer builder (chamfer() names one face for all edges)
    chamfer_1_edges_1 = [part_4.edges().sort_by_distance(p)[0] for p in [
        (-24.08716707, -1.4, 10.059564165),
    ]]
    chamfer_1_side_1 = [part_4.faces().sort_by_distance(p)[0] for p in [
        (-25.240379593, 0.014889063, 10.059564165),
    ]]
    chamfer_1_edges_2 = [part_4.edges().sort_by_distance(p)[0] for p in [
        (36.91283293, -1.4, 10.059564165),
    ]]
    chamfer_1_side_2 = [part_4.faces().sort_by_distance(p)[0] for p in [
        (38.018116032, 0.007874653, 10.059564165),
    ]]
    chamfer_1 = BRepFilletAPI_MakeChamfer(part_4.part.solid().wrapped)
    for e in chamfer_1_edges_1:
        chamfer_1.Add(CHAMFER_1_SIZE, CHAMFER_1_SIZE2, e.wrapped, chamfer_1_side_1[0].wrapped)  # the first distance lies on this face
    for e in chamfer_1_edges_2:
        chamfer_1.Add(CHAMFER_1_SIZE, CHAMFER_1_SIZE2, e.wrapped, chamfer_1_side_2[0].wrapped)  # the first distance lies on this face
    add(Compound.cast(chamfer_1.Shape()), mode=Mode.REPLACE)


solid = part_4.part
